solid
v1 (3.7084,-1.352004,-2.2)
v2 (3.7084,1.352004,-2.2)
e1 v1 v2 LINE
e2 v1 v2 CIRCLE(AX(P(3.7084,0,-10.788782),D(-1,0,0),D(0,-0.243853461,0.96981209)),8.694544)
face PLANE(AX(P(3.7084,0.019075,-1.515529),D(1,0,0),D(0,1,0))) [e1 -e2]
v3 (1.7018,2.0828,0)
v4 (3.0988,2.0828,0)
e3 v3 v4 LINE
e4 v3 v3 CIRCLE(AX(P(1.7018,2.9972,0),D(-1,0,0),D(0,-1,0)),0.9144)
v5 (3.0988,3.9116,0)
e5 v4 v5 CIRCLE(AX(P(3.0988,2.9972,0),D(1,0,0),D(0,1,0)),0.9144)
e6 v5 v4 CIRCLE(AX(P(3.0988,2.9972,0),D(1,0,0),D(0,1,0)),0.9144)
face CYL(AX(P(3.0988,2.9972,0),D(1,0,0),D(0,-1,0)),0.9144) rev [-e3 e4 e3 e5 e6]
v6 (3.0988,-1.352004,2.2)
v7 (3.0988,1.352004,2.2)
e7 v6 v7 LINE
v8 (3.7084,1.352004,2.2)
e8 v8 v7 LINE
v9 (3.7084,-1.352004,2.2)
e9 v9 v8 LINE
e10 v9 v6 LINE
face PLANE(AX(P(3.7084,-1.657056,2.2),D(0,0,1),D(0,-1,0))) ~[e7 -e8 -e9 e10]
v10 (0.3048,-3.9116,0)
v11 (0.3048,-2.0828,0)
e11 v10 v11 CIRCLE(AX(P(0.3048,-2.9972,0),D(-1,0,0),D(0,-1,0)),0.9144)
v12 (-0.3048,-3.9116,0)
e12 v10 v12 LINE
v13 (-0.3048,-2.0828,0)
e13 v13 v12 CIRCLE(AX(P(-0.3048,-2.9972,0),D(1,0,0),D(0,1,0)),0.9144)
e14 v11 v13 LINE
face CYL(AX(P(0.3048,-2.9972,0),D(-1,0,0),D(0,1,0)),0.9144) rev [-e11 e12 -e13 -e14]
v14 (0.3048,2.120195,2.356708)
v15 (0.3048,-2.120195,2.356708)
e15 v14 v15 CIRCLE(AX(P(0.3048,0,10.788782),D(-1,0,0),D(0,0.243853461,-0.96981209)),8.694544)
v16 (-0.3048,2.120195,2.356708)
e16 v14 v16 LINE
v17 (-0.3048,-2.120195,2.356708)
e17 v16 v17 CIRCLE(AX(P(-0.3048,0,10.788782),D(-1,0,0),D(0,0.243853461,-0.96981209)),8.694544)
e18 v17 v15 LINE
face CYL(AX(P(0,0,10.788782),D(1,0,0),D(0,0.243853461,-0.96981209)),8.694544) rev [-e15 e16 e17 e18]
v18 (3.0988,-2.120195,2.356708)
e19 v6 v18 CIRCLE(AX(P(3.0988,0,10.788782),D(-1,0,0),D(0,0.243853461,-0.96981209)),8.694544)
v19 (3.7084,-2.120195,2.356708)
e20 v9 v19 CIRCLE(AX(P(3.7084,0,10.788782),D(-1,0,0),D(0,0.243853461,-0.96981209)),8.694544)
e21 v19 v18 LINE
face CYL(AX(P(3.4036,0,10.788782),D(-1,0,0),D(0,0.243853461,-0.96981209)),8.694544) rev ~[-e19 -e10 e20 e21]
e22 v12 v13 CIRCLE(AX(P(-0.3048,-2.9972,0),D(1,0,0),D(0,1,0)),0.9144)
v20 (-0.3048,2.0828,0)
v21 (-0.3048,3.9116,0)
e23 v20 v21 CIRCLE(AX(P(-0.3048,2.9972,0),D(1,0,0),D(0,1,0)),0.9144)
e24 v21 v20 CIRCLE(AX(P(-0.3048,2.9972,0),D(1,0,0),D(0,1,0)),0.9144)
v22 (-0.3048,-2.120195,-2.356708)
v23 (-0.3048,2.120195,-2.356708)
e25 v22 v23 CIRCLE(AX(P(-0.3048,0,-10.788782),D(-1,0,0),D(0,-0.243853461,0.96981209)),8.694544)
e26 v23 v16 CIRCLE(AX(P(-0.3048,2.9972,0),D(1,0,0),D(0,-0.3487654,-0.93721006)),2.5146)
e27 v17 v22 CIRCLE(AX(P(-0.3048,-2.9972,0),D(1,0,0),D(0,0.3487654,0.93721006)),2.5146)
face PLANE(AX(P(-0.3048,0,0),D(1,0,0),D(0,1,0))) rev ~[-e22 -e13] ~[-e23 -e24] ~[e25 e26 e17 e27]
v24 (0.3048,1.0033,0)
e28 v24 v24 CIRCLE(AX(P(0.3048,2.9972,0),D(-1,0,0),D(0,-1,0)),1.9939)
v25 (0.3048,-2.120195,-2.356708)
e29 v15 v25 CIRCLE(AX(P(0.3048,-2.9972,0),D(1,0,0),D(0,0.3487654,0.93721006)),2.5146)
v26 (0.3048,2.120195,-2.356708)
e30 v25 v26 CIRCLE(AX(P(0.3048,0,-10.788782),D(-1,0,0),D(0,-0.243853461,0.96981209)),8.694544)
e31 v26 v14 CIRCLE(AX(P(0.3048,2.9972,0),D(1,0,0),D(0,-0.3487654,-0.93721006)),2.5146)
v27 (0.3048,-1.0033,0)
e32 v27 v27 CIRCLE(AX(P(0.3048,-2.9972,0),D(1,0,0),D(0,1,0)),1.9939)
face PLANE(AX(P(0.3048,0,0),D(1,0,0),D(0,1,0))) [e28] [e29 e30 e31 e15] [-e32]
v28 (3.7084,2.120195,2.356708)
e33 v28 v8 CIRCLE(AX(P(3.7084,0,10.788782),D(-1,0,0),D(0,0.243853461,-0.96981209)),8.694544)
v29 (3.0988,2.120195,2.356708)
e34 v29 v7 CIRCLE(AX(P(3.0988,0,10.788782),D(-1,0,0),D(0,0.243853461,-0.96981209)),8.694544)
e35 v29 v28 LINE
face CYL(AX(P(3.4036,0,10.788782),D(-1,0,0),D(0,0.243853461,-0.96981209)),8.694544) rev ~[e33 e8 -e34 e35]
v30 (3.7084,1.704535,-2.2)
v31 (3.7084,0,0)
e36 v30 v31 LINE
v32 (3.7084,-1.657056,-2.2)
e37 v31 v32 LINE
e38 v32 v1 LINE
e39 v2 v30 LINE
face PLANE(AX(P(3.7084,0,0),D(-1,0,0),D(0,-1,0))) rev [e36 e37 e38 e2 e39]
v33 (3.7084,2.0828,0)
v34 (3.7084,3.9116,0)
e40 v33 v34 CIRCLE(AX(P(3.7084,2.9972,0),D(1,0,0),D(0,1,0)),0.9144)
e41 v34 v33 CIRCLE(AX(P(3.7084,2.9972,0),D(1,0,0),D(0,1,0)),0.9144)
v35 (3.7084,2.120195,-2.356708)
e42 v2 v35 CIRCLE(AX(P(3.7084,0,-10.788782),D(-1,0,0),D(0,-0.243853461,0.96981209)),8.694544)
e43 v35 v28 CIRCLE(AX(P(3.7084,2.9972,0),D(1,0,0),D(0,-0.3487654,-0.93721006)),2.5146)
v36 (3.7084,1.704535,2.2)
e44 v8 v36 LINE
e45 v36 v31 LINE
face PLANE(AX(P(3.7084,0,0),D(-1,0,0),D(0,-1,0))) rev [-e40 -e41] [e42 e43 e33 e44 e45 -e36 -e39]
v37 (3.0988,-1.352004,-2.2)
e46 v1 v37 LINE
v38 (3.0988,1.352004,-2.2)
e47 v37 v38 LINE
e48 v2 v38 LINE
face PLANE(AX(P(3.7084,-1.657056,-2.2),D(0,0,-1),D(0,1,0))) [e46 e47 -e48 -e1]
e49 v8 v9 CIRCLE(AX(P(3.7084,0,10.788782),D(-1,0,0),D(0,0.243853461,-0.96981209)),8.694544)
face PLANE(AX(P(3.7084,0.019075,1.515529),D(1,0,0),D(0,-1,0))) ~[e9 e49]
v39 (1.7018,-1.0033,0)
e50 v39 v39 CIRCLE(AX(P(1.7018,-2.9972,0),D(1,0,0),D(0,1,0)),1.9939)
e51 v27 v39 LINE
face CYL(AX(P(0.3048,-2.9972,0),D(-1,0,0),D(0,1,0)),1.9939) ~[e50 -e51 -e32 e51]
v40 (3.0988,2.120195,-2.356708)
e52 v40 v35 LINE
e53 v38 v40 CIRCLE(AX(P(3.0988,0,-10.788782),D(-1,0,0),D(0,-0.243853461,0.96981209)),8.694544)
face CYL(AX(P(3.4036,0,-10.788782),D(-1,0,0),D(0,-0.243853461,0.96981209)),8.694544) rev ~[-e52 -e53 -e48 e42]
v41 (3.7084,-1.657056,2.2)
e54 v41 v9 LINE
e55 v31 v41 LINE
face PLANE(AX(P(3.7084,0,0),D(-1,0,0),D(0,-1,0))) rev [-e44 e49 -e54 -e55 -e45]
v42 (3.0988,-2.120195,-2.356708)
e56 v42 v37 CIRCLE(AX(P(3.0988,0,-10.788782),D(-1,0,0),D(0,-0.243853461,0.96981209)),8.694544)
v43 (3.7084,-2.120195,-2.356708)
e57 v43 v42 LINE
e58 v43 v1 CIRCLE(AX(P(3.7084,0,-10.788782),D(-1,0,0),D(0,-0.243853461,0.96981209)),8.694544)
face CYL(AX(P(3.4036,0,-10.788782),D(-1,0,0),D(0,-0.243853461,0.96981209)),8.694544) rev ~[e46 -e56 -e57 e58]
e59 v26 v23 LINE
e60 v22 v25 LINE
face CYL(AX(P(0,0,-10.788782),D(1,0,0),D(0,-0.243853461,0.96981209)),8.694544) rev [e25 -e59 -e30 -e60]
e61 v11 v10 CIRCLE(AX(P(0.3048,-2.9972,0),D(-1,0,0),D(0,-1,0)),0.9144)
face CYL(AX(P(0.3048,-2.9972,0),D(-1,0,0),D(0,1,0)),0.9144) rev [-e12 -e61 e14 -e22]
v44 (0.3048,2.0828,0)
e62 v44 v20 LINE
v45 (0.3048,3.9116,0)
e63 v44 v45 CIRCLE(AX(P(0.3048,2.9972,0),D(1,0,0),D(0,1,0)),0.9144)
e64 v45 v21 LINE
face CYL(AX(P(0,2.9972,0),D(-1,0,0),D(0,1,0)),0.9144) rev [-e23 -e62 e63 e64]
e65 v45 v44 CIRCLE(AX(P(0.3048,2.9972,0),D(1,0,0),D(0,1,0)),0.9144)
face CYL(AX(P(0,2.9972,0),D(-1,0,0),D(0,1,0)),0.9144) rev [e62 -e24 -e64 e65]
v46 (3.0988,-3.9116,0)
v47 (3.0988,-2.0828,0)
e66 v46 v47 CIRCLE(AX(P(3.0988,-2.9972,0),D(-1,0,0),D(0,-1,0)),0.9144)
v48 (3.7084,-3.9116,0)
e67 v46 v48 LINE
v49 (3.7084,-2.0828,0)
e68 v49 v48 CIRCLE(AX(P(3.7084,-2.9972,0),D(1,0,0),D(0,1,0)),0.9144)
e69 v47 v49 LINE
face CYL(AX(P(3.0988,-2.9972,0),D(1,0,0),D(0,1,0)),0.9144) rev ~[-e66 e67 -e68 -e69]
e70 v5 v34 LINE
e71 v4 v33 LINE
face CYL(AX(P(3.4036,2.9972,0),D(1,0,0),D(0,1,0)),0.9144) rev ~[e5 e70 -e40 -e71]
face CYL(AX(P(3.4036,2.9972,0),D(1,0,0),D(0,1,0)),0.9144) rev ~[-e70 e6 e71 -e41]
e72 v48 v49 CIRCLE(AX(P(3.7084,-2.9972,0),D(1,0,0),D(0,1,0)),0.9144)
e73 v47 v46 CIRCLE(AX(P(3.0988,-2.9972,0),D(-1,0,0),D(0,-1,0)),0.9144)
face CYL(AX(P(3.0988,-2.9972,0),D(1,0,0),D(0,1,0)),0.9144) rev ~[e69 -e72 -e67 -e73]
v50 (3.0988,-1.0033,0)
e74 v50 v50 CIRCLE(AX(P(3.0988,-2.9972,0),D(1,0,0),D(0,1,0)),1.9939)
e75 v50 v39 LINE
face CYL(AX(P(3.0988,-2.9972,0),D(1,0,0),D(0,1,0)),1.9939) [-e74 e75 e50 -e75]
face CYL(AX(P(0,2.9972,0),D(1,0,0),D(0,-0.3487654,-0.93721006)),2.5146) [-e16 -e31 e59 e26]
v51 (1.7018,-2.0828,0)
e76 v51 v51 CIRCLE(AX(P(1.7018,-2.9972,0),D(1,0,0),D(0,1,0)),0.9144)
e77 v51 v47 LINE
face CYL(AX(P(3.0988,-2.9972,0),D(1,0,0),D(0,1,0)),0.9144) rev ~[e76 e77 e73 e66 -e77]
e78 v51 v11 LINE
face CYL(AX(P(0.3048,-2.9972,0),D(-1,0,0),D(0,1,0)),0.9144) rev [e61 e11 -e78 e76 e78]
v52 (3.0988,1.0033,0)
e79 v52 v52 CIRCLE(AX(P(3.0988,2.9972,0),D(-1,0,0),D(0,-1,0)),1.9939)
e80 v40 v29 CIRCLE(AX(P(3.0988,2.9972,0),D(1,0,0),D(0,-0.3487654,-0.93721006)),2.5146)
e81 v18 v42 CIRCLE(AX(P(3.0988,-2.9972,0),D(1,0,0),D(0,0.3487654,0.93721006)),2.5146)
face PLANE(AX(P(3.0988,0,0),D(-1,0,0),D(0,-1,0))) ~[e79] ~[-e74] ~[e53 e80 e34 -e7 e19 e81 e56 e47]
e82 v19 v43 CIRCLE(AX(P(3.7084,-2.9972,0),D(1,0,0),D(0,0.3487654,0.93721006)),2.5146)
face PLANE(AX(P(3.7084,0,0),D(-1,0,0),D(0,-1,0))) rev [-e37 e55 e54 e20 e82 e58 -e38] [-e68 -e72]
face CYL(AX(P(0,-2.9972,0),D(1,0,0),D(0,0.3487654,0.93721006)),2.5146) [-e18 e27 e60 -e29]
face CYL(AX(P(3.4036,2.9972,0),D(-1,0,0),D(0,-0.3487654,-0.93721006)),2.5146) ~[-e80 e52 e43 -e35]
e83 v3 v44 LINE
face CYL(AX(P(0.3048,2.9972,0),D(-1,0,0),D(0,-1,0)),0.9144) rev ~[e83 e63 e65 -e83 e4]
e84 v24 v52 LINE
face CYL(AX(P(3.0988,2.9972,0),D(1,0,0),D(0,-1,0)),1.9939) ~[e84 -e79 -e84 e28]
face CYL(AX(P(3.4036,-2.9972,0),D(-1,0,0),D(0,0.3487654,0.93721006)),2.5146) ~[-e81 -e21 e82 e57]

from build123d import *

# Parameters (mm, degrees)
F0_R     = 0.9144
F1_DEPTH = 0.3048
F2_R     = 1.9939
F2_R_2   = 0.9144
F3_DEPTH = 1.397
F8_DEPTH = 0.6096


# Not quite as in the source:
# - a pattern or mirror of a feature is missing from the dataset's text; its kind, count and spacing are read off the source's solid


with BuildPart() as f1:
    # F0 (on Right) → F1 (new body, symmetric)
    with BuildSketch(Plane.YZ):
        with BuildLine():
            ThreePointArc((2.1201945262, 2.3567084162), (0, 2.094238318), (-2.1201945262, 2.3567084162))
            ThreePointArc((-2.1201945262, 2.3567084162), (-5.5118, 0), (-2.1201945262, -2.3567084162))
            ThreePointArc((-2.1201945262, -2.3567084162), (0, -2.094238318), (2.1201945262, -2.3567084162))
            ThreePointArc((2.1201945262, -2.3567084162), (5.5118, 0), (2.1201945262, 2.3567084162))
        make_face()
        with Locations((-2.9972, 0)):
            Circle(F0_R, mode=Mode.SUBTRACT)
        with Locations((2.9972, 0)):
            Circle(F0_R, mode=Mode.SUBTRACT)
    extrude(amount=F1_DEPTH, both=True)

    # F2 (on face) → F3 (join)
    with BuildSketch(Plane.YZ.offset(0.3048)):
        with Locations((-2.9972, 0)):
            Circle(F2_R)
        with Locations((-2.9972, 0)):
            Circle(F2_R_2, mode=Mode.SUBTRACT)
    extrude(amount=F3_DEPTH)

    # F4: F1 across plane


with BuildPart() as f1_1:
    add(f1.part)
    add(f1.part.mirror(Plane.XZ))

    # F5: F1 across face


with BuildPart() as f1_2:
    add(f1_1.part)
    add(f1_1.part.mirror(Plane(origin=(1.7018, -2.9972, 0), x_dir=(0, 1, 0), z_dir=(1, 0, 0))))

    # F7 (on face) → F8 (join, through all)
    with BuildSketch(Plane.YZ.offset(3.7084)):
        Polygon((1.7045348049, -2.2), (0, 0), (-1.6570564457, -2.2), align=None)
    f8 = extrude(amount=-F8_DEPTH)

    # F8_copies: F8 across plane
    add(f8.mirror(Plane.XY))


solid = f1_2.part
